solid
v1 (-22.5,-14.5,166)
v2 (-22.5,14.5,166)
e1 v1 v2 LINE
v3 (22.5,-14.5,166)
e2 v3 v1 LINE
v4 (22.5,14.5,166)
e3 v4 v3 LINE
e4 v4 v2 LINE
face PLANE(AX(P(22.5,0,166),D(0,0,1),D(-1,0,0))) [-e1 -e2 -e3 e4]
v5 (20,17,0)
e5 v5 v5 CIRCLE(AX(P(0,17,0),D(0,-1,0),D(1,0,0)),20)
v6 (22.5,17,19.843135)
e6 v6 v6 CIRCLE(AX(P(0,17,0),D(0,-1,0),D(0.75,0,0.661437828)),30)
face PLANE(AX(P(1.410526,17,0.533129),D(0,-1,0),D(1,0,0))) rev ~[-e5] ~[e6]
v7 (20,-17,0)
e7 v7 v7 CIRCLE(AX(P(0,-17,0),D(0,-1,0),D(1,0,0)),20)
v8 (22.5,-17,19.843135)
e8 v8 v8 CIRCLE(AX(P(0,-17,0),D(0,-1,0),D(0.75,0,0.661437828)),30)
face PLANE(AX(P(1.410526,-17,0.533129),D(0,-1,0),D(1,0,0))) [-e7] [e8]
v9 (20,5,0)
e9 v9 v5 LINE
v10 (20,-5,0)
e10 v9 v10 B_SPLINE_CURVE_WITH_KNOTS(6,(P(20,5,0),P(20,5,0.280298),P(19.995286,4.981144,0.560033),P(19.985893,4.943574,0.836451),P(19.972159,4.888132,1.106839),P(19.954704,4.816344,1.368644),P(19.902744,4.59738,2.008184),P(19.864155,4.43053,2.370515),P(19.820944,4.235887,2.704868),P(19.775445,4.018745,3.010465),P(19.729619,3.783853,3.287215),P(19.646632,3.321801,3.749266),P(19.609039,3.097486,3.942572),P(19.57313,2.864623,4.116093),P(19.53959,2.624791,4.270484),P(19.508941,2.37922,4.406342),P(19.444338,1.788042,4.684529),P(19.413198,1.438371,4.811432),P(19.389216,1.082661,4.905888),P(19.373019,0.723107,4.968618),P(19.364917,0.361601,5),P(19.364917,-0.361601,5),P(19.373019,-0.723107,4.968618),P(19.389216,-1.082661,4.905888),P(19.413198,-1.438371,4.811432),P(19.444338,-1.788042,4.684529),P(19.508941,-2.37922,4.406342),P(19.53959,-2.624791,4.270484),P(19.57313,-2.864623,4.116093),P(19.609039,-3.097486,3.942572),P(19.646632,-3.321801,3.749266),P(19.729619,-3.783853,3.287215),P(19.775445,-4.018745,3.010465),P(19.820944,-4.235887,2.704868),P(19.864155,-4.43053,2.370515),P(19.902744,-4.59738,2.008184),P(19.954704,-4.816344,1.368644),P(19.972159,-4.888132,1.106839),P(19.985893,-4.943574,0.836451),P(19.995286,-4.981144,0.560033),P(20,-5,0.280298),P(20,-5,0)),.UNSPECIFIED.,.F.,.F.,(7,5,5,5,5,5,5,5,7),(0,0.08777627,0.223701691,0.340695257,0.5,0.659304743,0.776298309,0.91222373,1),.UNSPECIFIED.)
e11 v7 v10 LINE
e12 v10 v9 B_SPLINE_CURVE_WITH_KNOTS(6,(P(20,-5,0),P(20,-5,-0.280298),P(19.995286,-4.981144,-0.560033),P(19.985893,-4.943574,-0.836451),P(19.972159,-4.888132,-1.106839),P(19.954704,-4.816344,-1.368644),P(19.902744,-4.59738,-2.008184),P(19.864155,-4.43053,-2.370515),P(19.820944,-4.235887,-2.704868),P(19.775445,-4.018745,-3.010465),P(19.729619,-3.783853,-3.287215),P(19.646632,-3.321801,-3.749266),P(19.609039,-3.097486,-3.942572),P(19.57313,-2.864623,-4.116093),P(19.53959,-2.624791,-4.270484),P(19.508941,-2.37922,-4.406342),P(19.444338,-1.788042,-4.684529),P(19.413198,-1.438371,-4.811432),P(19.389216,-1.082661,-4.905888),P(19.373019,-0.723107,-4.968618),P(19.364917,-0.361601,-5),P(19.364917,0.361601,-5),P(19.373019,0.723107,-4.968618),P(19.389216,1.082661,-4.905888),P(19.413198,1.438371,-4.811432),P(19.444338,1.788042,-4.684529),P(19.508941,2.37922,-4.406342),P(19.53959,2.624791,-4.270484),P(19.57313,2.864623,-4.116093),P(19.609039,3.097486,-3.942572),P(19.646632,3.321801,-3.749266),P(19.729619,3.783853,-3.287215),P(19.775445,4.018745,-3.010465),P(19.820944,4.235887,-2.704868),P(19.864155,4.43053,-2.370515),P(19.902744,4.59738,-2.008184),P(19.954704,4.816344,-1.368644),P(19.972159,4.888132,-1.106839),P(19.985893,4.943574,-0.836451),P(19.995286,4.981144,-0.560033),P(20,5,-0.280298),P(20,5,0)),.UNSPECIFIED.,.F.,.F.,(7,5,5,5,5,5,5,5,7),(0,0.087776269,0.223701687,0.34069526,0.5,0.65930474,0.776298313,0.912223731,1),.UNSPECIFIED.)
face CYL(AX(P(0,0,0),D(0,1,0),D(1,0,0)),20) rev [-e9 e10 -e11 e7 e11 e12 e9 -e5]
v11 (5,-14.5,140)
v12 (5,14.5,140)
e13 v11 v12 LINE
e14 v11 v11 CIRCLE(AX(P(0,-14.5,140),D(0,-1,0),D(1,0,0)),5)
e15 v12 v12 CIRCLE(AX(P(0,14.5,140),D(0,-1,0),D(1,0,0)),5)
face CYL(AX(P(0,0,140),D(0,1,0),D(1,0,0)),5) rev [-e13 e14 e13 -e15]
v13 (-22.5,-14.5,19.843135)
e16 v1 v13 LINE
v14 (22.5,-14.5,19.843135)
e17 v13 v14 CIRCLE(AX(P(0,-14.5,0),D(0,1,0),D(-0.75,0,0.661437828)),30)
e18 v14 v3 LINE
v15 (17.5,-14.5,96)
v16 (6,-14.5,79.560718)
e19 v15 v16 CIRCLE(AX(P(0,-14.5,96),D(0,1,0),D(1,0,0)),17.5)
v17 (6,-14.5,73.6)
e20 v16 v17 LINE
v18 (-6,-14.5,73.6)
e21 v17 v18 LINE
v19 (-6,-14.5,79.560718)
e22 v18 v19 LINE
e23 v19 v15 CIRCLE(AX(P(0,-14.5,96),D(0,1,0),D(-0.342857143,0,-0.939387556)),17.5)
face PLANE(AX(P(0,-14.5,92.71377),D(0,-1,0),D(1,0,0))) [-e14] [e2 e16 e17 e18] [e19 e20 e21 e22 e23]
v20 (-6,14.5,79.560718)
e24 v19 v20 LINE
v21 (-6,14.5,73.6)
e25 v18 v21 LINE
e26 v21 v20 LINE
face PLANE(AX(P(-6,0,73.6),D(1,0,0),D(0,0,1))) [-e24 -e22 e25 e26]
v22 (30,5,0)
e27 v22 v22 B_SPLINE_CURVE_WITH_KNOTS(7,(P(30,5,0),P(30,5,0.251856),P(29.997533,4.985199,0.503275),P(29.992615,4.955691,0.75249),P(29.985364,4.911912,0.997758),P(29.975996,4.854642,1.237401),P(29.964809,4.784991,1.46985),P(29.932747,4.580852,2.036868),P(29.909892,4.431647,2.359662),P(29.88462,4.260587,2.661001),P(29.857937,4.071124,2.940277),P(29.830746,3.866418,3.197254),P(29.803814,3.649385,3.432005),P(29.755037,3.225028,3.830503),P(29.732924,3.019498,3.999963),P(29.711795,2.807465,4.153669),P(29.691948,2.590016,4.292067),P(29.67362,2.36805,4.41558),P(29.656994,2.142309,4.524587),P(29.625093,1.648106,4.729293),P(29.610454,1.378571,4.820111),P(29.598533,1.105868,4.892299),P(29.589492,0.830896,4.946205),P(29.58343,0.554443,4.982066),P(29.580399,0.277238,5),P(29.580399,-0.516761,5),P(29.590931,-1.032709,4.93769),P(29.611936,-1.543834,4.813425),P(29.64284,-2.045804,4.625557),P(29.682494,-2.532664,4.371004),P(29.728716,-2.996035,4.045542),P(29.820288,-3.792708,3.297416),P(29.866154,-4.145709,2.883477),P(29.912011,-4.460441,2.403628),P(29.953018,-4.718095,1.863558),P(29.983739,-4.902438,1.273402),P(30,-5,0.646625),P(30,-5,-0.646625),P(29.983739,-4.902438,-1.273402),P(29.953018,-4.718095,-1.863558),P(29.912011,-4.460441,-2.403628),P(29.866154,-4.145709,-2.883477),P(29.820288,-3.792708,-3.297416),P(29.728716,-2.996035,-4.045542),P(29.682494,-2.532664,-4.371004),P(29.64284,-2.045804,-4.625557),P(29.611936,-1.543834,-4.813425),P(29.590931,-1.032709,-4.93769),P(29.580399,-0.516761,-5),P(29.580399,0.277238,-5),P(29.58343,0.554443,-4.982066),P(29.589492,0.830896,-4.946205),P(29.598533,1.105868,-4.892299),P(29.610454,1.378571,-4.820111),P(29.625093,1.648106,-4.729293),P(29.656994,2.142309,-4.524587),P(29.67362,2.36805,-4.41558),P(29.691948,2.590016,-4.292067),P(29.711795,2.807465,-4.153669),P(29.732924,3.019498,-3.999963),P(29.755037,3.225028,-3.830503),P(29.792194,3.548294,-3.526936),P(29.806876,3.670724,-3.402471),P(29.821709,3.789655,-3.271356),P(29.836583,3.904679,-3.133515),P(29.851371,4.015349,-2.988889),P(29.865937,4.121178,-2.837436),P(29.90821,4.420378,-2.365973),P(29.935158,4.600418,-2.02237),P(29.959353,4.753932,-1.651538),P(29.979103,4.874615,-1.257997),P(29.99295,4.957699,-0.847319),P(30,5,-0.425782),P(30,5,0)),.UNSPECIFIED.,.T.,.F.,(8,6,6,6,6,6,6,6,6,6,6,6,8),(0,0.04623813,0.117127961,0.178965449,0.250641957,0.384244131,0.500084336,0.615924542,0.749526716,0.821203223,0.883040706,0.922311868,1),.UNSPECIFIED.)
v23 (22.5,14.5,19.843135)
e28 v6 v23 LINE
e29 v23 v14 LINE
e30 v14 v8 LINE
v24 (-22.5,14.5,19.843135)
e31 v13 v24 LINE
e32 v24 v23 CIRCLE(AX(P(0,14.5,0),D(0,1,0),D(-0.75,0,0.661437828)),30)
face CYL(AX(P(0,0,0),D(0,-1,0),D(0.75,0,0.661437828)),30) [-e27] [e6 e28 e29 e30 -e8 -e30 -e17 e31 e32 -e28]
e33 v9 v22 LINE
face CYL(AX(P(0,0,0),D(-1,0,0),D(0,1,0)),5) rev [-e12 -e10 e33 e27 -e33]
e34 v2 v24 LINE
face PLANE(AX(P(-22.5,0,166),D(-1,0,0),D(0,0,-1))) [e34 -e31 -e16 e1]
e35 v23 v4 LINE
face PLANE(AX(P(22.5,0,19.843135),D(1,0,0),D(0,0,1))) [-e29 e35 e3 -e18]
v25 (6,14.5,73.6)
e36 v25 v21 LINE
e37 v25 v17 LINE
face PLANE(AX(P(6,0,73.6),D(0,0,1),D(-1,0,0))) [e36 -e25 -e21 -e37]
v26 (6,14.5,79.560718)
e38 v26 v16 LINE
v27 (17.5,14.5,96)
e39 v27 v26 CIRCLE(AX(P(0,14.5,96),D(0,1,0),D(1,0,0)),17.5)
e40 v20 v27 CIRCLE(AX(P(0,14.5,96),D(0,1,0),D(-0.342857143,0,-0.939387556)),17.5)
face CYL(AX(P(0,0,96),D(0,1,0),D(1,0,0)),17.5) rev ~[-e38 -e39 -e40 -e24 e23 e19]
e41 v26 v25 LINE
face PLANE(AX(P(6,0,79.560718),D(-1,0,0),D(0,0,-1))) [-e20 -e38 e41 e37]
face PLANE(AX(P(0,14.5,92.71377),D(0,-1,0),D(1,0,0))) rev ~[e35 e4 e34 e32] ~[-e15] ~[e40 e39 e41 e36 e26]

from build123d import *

# Parameters (mm, degrees)
F0_R     = 20
F1_DEPTH = 17
F2_R     = 5
F3_DEPTH = 30.001
F4_DEPTH = 12.5
F0_R_2   = 5
F5_DEPTH = 14.5


# Not quite as in the source:
# - a feature names something its author has since deleted; it is built from what else it names


with BuildPart() as f1:
    # F0 (on Front) → F1 (new body, symmetric)
    with BuildSketch(Plane.XZ):
        with BuildLine():
            ThreePointArc((-22.5, 19.843134833), (-10.6066017178, -28.0624304008), (30, 0))
            ThreePointArc((30, 0), (28.0624304008, 10.6066017178), (22.5, 19.843134833))
            ThreePointArc((22.5, 19.843134833), (0, 30), (-22.5, 19.843134833))
        make_face()
        Circle(F0_R, mode=Mode.SUBTRACT)
    extrude(amount=F1_DEPTH, both=True)

    # F2 (on Right) → F3 (cut, through all)
    with BuildSketch(Plane.YZ):
        Circle(F2_R)
    extrude(amount=F3_DEPTH, mode=Mode.SUBTRACT)

    # F0 (on Front) → F4 (cut, symmetric)
    with BuildSketch(Plane.XZ):
        with BuildLine():
            ThreePointArc((6, 79.5607177772), (0, 78.5), (-6, 79.5607177772))
            Line((-6, 79.5607177772), (-6, 73.6))
            Line((-6, 73.6), (6, 73.6))
            Line((6, 73.6), (6, 79.5607177772))
        make_face()
    extrude(amount=F4_DEPTH, both=True, mode=Mode.SUBTRACT)

    # F0 (on Front) → F5 (join, symmetric)
    with BuildSketch(Plane.XZ):
        with BuildLine():
            ThreePointArc((-22.5, 19.843134833), (0, 30), (22.5, 19.843134833))
            Line((22.5, 19.843134833), (22.5, 166))
            Line((22.5, 166), (-22.5, 166))
            Line((-22.5, 166), (-22.5, 19.843134833))
        make_face()
        with BuildLine():
            ThreePointArc((-6, 79.5607177772), (-10.0312013239, 110.3396303997), (17.5, 96))
            ThreePointArc((17.5, 96), (14.3396303997, 85.9687986761), (6, 79.5607177772))
            Line((6, 79.5607177772), (6, 73.6))
            Line((6, 73.6), (-6, 73.6))
            Line((-6, 73.6), (-6, 79.5607177772))
        make_face(mode=Mode.SUBTRACT)
        with Locations((0, 140)):
            Circle(F0_R_2, mode=Mode.SUBTRACT)
    extrude(amount=F5_DEPTH, both=True)


solid = f1.part
